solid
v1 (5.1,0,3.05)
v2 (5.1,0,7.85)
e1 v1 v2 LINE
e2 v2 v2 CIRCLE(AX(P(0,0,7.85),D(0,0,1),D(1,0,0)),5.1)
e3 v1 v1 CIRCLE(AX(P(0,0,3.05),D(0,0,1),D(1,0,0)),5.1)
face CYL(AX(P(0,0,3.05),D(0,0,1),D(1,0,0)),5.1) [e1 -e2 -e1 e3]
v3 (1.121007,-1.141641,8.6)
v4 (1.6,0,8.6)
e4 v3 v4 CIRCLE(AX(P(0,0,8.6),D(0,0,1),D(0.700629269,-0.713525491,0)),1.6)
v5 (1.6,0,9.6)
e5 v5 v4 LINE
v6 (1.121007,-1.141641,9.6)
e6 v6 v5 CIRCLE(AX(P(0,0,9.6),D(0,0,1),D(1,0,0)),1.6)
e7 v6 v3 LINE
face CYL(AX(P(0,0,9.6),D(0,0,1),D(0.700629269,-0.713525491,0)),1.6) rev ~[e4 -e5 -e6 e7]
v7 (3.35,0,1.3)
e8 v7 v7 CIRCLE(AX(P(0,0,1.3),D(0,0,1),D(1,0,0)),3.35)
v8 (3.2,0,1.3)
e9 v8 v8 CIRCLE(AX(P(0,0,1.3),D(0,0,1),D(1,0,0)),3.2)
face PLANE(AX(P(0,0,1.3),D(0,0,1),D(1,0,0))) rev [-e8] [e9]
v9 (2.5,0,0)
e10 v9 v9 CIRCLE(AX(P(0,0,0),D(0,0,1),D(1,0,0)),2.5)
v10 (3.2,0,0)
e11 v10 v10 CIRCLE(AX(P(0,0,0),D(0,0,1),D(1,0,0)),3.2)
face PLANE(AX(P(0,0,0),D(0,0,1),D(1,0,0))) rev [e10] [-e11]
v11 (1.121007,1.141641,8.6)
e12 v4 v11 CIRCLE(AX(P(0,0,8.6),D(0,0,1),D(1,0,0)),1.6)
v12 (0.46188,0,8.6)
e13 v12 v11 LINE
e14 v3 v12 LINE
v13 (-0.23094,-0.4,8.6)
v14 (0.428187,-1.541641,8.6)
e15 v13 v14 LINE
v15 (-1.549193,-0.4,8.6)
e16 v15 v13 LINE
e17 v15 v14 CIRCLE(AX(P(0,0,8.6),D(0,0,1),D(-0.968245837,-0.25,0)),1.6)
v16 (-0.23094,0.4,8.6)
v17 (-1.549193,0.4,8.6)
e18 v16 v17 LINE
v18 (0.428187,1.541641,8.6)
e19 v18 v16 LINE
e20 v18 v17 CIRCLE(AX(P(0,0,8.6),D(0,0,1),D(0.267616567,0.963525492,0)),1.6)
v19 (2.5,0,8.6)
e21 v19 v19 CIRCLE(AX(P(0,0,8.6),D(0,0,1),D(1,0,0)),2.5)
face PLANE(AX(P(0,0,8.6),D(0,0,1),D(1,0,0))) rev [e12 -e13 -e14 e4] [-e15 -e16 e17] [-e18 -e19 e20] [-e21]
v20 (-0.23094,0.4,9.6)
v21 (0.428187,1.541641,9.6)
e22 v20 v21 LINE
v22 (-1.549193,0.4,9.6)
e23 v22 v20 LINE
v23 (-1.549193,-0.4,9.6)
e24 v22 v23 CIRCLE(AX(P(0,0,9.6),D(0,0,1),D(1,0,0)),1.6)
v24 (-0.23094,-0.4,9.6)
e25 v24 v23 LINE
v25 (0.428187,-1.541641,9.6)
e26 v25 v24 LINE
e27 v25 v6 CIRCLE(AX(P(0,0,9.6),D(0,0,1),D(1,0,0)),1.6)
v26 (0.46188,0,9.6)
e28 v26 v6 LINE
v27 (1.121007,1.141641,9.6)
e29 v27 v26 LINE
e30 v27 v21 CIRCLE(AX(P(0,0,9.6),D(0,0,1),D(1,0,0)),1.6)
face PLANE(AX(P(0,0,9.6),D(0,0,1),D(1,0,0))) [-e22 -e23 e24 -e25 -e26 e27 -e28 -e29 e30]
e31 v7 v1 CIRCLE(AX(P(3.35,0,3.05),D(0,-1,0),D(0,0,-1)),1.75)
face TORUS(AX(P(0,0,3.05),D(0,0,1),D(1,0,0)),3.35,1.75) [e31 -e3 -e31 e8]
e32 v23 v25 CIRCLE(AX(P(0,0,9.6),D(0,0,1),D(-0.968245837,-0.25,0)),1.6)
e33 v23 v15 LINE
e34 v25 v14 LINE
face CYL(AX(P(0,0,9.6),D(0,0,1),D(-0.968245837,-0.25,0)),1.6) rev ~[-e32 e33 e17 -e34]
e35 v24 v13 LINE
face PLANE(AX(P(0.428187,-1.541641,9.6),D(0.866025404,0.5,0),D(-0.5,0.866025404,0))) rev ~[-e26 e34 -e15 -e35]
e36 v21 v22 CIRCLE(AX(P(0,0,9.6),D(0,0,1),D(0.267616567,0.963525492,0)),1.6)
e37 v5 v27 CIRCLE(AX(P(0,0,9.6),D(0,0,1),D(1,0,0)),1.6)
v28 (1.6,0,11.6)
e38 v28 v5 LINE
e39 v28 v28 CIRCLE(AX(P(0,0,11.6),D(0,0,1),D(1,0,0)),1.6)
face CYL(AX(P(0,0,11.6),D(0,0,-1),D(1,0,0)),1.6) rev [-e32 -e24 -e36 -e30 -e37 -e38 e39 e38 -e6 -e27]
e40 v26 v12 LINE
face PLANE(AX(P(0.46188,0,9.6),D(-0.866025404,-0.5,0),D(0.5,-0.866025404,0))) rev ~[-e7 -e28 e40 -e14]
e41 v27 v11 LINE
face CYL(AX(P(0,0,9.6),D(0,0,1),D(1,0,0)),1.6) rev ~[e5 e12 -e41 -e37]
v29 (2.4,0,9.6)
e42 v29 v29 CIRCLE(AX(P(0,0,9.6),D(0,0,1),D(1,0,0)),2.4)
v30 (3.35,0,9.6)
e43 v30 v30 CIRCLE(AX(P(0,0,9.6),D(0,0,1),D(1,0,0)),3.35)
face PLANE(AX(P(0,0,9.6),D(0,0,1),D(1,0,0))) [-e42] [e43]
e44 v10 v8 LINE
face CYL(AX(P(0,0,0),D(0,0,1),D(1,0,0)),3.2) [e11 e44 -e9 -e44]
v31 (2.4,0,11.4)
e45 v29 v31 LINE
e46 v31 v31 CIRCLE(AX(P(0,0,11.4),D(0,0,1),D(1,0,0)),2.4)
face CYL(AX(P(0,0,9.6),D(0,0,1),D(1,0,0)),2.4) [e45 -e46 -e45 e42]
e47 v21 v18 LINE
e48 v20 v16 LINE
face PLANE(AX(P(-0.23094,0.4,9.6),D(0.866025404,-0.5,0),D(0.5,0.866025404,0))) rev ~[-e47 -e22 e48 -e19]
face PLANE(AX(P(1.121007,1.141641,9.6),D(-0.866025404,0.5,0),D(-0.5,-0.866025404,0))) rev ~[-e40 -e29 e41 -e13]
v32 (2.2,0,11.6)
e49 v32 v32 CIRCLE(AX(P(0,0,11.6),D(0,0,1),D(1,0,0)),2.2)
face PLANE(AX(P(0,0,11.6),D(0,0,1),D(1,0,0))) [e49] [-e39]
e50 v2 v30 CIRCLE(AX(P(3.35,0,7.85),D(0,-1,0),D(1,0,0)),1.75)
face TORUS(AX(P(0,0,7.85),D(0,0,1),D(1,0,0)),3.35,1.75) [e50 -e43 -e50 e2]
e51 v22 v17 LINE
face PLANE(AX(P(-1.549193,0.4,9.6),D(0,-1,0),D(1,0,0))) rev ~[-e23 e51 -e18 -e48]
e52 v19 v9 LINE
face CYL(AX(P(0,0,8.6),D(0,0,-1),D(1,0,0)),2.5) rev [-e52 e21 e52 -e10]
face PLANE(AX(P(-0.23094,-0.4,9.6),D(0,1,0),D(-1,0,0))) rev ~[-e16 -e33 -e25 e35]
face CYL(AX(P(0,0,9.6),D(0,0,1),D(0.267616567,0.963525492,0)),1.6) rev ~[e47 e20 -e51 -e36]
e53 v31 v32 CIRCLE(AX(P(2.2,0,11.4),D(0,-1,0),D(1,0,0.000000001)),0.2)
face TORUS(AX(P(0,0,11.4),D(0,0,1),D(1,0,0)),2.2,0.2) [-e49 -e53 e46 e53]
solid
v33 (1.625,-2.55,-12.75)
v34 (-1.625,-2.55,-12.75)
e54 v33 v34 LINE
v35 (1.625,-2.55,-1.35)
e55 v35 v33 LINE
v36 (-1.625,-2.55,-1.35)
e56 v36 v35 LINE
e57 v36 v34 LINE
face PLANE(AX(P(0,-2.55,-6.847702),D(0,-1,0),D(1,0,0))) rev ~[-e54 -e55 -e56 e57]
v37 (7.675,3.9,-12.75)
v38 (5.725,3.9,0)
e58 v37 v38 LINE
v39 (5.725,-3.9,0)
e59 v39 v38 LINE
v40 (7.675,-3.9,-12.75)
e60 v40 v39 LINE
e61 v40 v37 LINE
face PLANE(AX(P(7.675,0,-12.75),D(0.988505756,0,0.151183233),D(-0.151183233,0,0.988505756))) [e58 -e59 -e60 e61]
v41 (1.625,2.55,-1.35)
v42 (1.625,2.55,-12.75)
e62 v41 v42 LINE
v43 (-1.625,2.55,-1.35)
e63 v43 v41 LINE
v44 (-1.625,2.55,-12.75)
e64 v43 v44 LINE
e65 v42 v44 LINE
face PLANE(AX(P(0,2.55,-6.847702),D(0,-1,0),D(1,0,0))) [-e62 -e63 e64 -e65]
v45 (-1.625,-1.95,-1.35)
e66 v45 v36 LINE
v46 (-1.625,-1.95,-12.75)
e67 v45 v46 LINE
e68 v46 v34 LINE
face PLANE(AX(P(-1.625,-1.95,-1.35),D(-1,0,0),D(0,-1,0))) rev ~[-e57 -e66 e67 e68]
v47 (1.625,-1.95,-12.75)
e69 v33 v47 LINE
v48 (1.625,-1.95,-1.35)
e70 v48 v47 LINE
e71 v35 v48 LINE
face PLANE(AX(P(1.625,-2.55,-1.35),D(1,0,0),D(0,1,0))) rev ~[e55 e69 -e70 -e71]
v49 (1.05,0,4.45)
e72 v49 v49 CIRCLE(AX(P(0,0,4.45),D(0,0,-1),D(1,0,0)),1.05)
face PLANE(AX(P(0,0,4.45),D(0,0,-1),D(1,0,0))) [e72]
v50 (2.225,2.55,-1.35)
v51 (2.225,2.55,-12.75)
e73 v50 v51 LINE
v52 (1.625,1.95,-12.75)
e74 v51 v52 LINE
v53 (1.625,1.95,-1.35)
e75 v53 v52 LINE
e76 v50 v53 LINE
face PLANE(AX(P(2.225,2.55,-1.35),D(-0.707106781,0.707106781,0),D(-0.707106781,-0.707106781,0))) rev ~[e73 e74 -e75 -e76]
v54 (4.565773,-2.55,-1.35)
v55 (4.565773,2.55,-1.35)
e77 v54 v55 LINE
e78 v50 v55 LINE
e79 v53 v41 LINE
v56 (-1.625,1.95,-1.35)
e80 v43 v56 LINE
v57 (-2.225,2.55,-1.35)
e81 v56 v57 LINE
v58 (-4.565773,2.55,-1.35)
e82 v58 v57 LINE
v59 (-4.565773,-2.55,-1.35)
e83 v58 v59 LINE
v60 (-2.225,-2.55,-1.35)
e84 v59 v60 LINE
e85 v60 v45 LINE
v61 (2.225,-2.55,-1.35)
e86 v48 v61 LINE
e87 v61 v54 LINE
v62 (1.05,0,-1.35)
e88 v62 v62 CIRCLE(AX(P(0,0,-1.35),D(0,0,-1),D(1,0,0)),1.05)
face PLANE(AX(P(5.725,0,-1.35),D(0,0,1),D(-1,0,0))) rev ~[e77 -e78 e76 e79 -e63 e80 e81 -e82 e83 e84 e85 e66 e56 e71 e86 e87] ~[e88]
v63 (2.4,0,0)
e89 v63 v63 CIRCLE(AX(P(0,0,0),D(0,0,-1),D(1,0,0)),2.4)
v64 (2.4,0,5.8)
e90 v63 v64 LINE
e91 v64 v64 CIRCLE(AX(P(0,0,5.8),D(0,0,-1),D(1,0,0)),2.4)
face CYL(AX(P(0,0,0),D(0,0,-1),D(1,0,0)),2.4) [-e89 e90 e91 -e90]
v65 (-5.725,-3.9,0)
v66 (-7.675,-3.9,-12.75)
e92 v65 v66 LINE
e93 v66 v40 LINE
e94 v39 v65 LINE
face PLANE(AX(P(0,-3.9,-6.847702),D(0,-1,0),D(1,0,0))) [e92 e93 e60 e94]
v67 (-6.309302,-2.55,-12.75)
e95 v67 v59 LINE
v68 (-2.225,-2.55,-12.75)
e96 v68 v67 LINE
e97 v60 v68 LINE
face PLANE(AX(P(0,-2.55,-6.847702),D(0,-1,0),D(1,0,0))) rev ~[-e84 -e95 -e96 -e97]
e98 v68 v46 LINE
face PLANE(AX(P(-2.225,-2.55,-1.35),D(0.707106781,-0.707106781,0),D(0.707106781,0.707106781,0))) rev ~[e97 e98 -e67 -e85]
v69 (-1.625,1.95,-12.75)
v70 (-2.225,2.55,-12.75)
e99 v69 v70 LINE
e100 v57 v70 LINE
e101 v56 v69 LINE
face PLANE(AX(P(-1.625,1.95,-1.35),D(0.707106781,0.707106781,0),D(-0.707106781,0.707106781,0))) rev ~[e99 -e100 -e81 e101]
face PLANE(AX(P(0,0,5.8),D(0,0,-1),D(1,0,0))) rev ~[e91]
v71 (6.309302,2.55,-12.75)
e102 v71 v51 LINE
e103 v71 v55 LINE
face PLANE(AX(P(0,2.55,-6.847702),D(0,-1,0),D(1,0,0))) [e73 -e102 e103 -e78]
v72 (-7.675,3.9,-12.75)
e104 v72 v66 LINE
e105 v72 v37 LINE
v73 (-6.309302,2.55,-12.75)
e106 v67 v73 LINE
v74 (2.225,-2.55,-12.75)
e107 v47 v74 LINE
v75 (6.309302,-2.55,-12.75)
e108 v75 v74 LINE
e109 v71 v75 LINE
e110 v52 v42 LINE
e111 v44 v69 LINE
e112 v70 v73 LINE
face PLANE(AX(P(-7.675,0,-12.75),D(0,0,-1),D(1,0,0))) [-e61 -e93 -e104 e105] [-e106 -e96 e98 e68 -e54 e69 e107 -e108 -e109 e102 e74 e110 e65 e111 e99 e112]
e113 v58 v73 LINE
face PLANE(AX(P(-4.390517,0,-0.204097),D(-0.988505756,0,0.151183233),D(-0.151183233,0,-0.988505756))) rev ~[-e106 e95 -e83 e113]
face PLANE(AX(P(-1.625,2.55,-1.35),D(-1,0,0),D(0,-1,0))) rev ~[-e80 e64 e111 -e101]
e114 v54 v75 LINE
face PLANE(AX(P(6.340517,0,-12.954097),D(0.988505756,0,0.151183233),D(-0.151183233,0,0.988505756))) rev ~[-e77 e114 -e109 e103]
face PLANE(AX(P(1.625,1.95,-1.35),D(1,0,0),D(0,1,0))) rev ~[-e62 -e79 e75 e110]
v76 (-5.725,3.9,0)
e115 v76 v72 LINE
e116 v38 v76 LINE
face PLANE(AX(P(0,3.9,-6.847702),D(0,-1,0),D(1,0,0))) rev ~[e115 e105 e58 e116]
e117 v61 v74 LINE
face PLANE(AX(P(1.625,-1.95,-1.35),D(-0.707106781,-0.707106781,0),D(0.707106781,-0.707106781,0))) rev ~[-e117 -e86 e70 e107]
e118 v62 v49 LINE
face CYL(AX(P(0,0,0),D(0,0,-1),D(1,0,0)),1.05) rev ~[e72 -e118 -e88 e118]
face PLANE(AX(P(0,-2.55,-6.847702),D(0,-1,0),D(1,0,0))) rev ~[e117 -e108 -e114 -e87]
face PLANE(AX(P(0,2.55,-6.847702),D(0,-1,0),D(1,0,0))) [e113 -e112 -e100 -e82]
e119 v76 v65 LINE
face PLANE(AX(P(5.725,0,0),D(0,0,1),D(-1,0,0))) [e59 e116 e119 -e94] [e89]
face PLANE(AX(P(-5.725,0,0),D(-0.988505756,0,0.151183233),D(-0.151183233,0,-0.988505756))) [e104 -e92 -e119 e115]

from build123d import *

# Parameters (mm, degrees)
F3_DEPTH  = 25
F4_R      = 2.4
F5_DEPTH  = 5.8
F7_DEPTH  = 3.9
F8_T      = -1.35
F10_DEPTH = 11.4


with BuildPart() as f1:
    # F0 (on Front) → F1 (revolve)
    with BuildSketch(Plane.XZ):
        with BuildLine():
            Line((0, 9.6), (0, 8.6))
            Line((0, 8.6), (2.5, 8.6))
            Line((2.5, 8.6), (2.5, 0))
            Line((2.5, 0), (3.2, 0))
            Line((3.2, 0), (3.2, 1.3))
            Line((3.2, 1.3), (3.35, 1.3))
            ThreePointArc((3.35, 1.3), (4.5874368671, 1.8125631329), (5.1, 3.05))
            Line((5.1, 3.05), (5.1, 7.85))
            ThreePointArc((5.1, 7.85), (4.5874368671, 9.0874368671), (3.35, 9.6))
            Line((3.35, 9.6), (2.4, 9.6))
            Line((2.4, 9.6), (2.4, 11.4))
            ThreePointArc((2.4, 11.4), (2.3414213562, 11.5414213562), (2.2, 11.6))
            Line((2.2, 11.6), (1.6, 11.6))
            Line((1.6, 11.6), (1.6, 9.6))
            Line((1.6, 9.6), (0, 9.6))
        make_face()
    revolve(axis=Axis((0, 0, 5.8), (0, 0, 1)))

    # F2 (on face) → F3 (cut)
    with BuildSketch(Plane.XY.offset(9.6)):
        with BuildLine():
            Line((-1.5491933385, 0.4), (-0.2309401077, 0.4))
            Line((-0.2309401077, 0.4), (0.4281865077, 1.5416407865))
            ThreePointArc((0.4281865077, 1.5416407865), (-0.8, 1.3856406461), (-1.5491933385, 0.4))
        make_face()
        with BuildLine():
            Line((1.1210068308, 1.1416407865), (0.4618802154, 0))
            Line((0.4618802154, 0), (1.1210068308, -1.1416407865))
            ThreePointArc((1.1210068308, -1.1416407865), (1.4754001032, -0.6190270878), (1.6, 0))
            ThreePointArc((1.6, 0), (1.4754001032, 0.6190270878), (1.1210068308, 1.1416407865))
        make_face()
        with BuildLine():
            Line((0.4281865077, -1.5416407865), (-0.2309401077, -0.4))
            Line((-0.2309401077, -0.4), (-1.5491933385, -0.4))
            ThreePointArc((-1.5491933385, -0.4), (-0.8, -1.3856406461), (0.4281865077, -1.5416407865))
        make_face()
    extrude(amount=-F3_DEPTH, mode=Mode.SUBTRACT)


with BuildPart() as f5:
    # F4 (on face) → F5 (new body)
    with BuildSketch(Plane(origin=(0, 0, 0), x_dir=(1, 0, 0), z_dir=(0, 0, -1))):
        Circle(F4_R)
    extrude(amount=-F5_DEPTH)

    # F6 (on Front) → F7 (join, symmetric)
    with BuildSketch(Plane.XZ):
        Polygon((5.725, 0), (0, 0), (-5.725, 0), (-7.675, -12.75), (7.675, -12.75), align=None)
    extrude(amount=F7_DEPTH, both=True)

    # F8
    f8_openings = [f5.faces().sort_by_distance(p)[0] for p in [
        (0, 0, -12.75),
    ]]
    offset(amount=F8_T, openings=f8_openings, kind=Kind.INTERSECTION)

    # F9 (on face) → F10 (join, through all)
    with BuildSketch(Plane(origin=(0, 0, -1.35), x_dir=(1, 0, 0), z_dir=(0, 0, -1))):
        Polygon((-1.625, 1.95), (-1.625, 2.55), (-2.225, 2.55), align=None)
        Polygon((2.225, 2.55), (1.625, 2.55), (1.625, 1.95), align=None)
        Polygon((-2.225, -2.55), (-1.625, -2.55), (-1.625, -1.95), align=None)
        Polygon((1.625, -1.95), (1.625, -2.55), (2.225, -2.55), align=None)
    extrude(amount=F10_DEPTH)


solid = Compound([f1.part, f5.part])
